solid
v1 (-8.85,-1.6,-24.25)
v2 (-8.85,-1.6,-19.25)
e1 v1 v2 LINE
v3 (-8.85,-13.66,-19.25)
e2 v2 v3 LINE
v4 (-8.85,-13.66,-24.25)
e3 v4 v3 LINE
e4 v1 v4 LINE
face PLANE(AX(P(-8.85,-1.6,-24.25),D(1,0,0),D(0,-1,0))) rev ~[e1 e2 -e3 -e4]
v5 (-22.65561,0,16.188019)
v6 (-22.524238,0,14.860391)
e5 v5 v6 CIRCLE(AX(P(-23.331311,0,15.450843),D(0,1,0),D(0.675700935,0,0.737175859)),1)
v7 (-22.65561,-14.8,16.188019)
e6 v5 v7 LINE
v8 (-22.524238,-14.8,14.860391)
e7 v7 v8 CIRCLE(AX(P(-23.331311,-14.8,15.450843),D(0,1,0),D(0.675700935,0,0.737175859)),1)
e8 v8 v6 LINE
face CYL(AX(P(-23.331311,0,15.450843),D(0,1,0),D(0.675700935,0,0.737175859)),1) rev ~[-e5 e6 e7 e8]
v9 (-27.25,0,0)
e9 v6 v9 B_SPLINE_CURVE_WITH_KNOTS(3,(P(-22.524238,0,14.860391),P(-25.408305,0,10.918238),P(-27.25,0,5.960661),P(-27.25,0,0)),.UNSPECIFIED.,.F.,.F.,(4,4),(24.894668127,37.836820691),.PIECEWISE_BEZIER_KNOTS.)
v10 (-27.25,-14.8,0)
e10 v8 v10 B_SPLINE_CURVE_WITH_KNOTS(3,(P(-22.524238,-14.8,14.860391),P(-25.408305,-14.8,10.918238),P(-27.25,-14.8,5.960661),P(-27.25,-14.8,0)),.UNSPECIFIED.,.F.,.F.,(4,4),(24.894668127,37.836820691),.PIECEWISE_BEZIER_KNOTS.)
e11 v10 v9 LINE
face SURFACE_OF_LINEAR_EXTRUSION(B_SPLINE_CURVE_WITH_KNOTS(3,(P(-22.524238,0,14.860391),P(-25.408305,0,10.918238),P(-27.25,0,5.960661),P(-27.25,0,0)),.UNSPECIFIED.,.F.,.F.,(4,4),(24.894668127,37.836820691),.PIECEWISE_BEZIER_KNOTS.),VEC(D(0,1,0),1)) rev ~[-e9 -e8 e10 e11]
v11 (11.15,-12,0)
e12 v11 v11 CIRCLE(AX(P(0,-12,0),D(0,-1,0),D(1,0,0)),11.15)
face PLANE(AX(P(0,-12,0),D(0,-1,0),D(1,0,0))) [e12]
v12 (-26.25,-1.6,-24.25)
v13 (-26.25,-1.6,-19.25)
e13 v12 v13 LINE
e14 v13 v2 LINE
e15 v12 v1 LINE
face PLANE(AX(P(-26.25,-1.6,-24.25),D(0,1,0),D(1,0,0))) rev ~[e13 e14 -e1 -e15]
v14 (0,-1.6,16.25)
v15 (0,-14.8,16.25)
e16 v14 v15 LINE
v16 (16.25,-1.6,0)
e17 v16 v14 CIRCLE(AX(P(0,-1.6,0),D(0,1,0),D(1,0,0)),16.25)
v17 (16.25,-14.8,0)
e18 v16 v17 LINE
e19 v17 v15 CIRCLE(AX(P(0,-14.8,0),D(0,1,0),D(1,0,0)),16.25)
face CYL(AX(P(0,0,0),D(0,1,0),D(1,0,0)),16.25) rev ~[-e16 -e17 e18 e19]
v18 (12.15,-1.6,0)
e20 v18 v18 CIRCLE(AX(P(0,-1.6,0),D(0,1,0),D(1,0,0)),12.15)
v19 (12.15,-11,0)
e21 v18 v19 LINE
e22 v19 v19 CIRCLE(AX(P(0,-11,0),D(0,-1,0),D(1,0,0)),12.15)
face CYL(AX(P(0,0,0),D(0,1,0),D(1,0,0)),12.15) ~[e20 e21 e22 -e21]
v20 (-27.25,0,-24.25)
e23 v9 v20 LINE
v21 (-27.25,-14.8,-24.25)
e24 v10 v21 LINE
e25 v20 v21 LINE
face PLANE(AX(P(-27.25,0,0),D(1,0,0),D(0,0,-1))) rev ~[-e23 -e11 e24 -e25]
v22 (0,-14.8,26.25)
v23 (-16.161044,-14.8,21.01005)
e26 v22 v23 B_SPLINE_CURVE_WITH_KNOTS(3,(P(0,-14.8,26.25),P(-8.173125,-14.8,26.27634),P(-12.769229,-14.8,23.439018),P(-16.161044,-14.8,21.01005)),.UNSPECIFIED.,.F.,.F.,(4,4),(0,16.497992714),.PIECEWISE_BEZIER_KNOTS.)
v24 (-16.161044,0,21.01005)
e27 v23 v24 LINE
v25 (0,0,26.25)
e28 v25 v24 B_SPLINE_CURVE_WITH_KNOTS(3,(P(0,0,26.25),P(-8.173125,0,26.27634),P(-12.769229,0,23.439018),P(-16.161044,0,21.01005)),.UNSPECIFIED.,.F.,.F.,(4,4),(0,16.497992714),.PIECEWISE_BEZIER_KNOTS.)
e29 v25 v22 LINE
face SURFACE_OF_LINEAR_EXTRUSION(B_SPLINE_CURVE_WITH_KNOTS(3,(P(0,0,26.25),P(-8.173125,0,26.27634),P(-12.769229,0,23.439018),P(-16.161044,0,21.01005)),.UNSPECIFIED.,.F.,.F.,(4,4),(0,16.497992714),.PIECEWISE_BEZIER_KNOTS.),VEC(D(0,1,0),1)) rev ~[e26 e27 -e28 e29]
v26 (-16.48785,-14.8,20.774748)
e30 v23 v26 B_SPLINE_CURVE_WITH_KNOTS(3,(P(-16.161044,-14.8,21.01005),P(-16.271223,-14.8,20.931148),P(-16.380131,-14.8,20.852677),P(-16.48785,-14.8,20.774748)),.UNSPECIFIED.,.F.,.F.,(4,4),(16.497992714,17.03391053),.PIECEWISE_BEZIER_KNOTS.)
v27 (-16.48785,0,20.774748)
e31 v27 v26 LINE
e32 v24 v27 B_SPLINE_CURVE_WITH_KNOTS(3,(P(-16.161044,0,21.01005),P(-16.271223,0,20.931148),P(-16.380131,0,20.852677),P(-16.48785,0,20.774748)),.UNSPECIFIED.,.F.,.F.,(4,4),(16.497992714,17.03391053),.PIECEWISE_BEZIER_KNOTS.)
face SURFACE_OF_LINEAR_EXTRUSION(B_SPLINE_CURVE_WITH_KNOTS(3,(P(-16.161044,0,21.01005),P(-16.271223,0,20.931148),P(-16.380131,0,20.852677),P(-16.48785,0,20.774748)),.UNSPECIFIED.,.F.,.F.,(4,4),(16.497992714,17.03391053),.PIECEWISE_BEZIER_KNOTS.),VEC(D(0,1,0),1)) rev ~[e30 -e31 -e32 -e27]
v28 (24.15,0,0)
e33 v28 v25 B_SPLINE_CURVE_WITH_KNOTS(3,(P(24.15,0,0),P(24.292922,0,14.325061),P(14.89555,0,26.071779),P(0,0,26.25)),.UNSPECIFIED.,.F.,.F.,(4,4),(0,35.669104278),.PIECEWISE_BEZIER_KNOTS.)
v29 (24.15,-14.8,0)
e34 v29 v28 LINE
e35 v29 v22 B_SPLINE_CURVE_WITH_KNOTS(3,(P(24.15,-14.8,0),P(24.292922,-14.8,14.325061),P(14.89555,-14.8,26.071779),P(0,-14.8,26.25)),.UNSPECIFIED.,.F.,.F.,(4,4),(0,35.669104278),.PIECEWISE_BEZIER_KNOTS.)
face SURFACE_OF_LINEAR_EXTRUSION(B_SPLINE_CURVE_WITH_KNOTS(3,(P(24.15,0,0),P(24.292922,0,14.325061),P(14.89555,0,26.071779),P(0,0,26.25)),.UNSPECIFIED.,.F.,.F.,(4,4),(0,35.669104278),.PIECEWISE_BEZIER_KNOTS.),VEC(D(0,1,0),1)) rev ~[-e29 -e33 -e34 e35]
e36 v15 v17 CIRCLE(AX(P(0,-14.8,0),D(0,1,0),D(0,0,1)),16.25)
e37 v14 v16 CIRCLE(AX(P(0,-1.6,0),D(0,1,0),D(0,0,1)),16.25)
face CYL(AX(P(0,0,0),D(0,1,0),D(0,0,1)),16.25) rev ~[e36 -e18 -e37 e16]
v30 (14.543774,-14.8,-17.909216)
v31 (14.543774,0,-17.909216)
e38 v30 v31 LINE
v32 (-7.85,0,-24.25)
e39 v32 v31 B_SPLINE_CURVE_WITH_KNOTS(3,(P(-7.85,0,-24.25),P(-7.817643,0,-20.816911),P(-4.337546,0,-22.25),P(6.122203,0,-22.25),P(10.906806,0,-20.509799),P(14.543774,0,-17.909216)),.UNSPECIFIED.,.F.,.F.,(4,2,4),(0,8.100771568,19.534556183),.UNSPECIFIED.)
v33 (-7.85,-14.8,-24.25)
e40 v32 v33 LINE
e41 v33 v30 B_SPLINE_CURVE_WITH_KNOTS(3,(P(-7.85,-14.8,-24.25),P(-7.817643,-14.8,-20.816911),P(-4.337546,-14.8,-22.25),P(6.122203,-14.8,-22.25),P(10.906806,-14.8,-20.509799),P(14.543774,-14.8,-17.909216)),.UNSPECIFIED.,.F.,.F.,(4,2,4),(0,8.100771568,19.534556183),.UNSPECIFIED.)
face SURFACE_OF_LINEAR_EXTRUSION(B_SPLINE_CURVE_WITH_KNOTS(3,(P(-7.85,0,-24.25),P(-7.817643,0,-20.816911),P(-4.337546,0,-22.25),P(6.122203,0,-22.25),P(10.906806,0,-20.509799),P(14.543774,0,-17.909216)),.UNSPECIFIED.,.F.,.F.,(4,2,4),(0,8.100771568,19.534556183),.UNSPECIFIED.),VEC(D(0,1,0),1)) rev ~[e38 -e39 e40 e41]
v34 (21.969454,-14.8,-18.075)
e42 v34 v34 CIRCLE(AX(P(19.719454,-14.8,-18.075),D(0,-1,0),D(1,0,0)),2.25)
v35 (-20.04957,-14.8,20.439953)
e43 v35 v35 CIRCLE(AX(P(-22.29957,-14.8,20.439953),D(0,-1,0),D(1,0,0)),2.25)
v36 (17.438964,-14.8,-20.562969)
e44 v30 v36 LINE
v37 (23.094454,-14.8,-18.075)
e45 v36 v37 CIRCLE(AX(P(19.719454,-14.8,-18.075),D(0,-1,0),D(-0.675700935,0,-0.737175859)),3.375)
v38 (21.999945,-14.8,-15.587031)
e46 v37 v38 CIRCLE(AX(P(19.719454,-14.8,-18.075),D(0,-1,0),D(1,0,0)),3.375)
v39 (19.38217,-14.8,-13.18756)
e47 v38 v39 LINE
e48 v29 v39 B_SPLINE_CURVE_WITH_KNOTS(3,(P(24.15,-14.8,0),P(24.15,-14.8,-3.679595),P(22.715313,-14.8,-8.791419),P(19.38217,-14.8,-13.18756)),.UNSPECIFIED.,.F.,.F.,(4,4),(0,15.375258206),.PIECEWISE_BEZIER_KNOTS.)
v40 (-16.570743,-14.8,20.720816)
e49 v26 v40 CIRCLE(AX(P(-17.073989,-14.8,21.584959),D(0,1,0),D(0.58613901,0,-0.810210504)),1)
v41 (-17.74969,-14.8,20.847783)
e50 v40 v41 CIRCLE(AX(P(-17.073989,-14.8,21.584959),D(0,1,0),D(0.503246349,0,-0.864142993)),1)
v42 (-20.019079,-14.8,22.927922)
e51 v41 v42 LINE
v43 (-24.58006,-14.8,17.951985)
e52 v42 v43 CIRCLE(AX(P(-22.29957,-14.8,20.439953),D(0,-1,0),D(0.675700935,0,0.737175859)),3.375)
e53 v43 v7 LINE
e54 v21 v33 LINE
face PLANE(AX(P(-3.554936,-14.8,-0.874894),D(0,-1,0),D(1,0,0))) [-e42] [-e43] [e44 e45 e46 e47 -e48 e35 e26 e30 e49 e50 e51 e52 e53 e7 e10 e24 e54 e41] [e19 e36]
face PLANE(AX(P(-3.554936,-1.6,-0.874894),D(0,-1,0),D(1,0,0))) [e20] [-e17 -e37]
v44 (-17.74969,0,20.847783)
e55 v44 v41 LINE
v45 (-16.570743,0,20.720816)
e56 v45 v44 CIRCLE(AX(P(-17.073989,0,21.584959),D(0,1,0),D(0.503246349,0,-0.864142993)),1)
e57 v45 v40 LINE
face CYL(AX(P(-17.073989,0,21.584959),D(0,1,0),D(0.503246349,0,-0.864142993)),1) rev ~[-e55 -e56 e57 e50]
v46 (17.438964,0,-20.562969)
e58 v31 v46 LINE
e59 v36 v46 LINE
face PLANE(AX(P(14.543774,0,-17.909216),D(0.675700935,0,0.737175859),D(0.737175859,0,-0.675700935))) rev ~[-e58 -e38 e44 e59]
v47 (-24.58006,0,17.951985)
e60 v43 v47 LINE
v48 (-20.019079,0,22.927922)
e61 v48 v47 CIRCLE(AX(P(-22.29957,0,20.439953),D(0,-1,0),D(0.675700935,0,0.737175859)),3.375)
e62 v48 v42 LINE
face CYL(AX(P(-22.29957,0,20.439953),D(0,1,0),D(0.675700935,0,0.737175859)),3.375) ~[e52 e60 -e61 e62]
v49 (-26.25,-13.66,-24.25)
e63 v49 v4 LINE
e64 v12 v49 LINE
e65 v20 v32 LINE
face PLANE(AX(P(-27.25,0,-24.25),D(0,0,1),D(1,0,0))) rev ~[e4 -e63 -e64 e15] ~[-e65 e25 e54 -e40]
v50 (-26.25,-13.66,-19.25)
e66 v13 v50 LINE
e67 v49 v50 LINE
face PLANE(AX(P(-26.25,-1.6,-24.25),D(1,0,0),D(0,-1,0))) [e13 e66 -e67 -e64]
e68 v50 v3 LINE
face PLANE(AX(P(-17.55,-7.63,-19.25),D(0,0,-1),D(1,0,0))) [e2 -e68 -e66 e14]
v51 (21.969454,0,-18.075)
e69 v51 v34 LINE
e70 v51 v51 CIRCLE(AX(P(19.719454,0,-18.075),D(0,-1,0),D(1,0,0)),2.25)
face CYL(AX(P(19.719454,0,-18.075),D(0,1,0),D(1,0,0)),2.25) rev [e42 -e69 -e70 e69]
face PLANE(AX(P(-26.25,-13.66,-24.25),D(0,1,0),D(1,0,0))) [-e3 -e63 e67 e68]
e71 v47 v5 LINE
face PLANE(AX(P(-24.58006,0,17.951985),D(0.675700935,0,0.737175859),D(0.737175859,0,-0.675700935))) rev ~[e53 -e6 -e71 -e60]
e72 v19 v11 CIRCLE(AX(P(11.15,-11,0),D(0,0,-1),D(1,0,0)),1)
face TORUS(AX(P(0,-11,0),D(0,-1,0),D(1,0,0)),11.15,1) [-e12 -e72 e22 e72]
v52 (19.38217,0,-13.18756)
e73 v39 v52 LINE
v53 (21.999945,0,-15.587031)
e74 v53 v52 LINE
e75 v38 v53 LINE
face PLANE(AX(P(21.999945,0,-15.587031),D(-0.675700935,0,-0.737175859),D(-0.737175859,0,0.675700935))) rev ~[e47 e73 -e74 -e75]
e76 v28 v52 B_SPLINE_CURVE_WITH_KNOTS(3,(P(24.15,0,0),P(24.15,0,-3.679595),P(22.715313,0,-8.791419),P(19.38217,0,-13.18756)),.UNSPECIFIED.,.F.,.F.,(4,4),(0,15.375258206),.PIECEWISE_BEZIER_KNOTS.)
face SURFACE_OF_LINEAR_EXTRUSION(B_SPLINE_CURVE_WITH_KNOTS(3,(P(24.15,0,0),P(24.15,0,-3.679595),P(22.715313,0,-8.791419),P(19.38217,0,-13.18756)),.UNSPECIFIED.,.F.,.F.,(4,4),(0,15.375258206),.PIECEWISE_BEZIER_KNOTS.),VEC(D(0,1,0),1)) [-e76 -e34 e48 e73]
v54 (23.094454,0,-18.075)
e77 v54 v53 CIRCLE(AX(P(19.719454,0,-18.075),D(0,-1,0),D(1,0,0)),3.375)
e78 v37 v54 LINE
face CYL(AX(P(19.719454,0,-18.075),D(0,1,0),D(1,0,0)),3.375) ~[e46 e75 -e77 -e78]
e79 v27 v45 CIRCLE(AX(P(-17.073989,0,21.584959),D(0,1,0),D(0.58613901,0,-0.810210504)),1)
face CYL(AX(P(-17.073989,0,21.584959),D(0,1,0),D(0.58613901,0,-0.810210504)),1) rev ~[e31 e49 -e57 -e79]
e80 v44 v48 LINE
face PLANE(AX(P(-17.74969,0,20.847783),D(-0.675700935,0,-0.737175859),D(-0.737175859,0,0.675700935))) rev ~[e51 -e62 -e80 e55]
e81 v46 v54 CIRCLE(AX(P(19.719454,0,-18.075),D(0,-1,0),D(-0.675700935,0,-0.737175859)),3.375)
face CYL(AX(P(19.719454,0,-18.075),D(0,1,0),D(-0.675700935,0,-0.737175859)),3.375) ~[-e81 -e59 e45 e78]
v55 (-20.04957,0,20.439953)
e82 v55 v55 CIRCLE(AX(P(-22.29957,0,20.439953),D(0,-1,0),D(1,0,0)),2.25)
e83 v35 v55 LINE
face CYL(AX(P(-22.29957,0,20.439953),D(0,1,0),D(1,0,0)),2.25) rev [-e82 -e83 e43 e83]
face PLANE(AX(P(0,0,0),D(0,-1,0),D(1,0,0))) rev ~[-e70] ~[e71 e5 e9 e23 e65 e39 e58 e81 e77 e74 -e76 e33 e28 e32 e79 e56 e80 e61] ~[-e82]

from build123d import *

# Parameters (mm, degrees)
F0_R     = 2.25
F1_DEPTH = 14.8
F0_R_2   = 12.15
F2_DEPTH = 1.6
F3_DEPTH = 12
F4_R     = 1
F5_W     = 17.4
F5_H     = 12.06
F6_DEPTH = 5


with BuildPart() as f1:
    # F0 (on Front) → F1 (new body)
    with BuildSketch(Plane.XZ):
        with BuildLine():
            Line((-27.25, 0), (-27.25, -24.25))
            Line((-27.25, -24.25), (-7.85, -24.25))
            add(Edge.make_bspline(
                [(-7.85, -24.25), (-7.8176427633, -20.8169110119), (-4.3375464156, -22.25), (0, -22.25)],
                knots=[0, 0, 0, 0, 8.1007715682, 8.1007715682, 8.1007715682, 8.1007715682], degree=3))
            add(Edge.make_bspline(
                [(14.5437740109, -17.909216005), (10.9068056005, -20.5097986935), (6.122203429, -22.25), (0, -22.25)],
                knots=[21.4185998801, 21.4185998801, 21.4185998801, 21.4185998801, 32.8372501894, 32.8372501894, 32.8372501894, 32.8372501894], degree=3))
            add(Edge.make_bspline(
                [(19.3821703567, -13.1875596661), (18.0720576154, -14.9154903789), (16.4686462302, -16.5328528348), (14.5437740109, -17.909216005)],
                knots=[15.3752582058, 15.3752582058, 15.3752582058, 15.3752582058, 21.4185998801, 21.4185998801, 21.4185998801, 21.4185998801], degree=3))
            add(Edge.make_bspline(
                [(24.15, 0), (24.15, -3.6795945823), (22.7153133033, -8.7914188713), (19.3821703567, -13.1875596661)],
                knots=[0, 0, 0, 0, 15.3752582058, 15.3752582058, 15.3752582058, 15.3752582058], degree=3))
            add(Edge.make_bspline(
                [(24.15, 0), (24.2929216474, 14.3250608817), (14.8955499753, 26.0717794299), (0, 26.25)],
                knots=[0, 0, 0, 0, 35.6691042781, 35.6691042781, 35.6691042781, 35.6691042781], degree=3))
            add(Edge.make_bspline(
                [(0, 26.25), (-5.135877891, 26.2629323961), (-11.114542158, 24.5071482084), (-16.161044046, 21.0100500089)],
                knots=[0, 0, 0, 0, 16.8847295513, 16.8847295513, 16.8847295513, 16.8847295513], degree=3))
            add(Edge.make_bspline(
                [(-16.161044046, 21.0100500089), (-16.2712231538, 20.9311478534), (-16.3801314978, 20.8526765927), (-16.487850408, 20.7747483814)],
                knots=[16.497992714, 16.497992714, 16.497992714, 16.497992714, 17.0339105302, 17.0339105302, 17.0339105302, 17.0339105302], degree=3))
            add(Edge.make_bspline(
                [(-16.487850408, 20.7747483814), (-16.7124834128, 20.6122397909), (-16.9319438817, 20.4520927797), (-17.1469693705, 20.2953244431)],
                knots=[17.0339105302, 17.0339105302, 17.0339105302, 17.0339105302, 18.1514935909, 18.1514935909, 18.1514935909, 18.1514935909], degree=3))
            add(Edge.make_bspline(
                [(-17.1469693705, 20.2953244431), (-19.1547308604, 18.7732329399), (-20.9874640515, 16.9609662016), (-22.5242380569, 14.8603912213)],
                knots=[17.9984458903, 17.9984458903, 17.9984458903, 17.9984458903, 24.8946681266, 24.8946681266, 24.8946681266, 24.8946681266], degree=3))
            add(Edge.make_bspline(
                [(-22.5242380569, 14.8603912213), (-25.4083045723, 10.9182384112), (-27.25, 5.9606612107), (-27.25, 0)],
                knots=[24.8946681266, 24.8946681266, 24.8946681266, 24.8946681266, 37.836820691, 37.836820691, 37.836820691, 37.836820691], degree=3))
        make_face()
        with BuildLine():
            ThreePointArc((16.25, 0), (-11.4904851943, -11.4904851943), (0, 16.25))
            ThreePointArc((0, 16.25), (11.4904851943, 11.4904851943), (16.25, 0))
        make_face(mode=Mode.SUBTRACT)
        with BuildLine():
            ThreePointArc((-22.6556099396, 16.1880189983), (-22.3361709954, 15.5493145647), (-22.5242380569, 14.8603912213))
            add(Edge.make_bspline(
                [(-17.1469693705, 20.2953244431), (-19.1547308604, 18.7732329399), (-20.9874640515, 16.9609662016), (-22.5242380569, 14.8603912213)],
                knots=[17.9984458903, 17.9984458903, 17.9984458903, 17.9984458903, 24.8946681266, 24.8946681266, 24.8946681266, 24.8946681266], degree=3))
            add(Edge.make_bspline(
                [(-16.5707430692, 20.7208158925), (-16.7643258601, 20.5815997135), (-16.9564357443, 20.4397686985), (-17.1469693705, 20.2953244431)],
                knots=[17.3440044956, 17.3440044956, 17.3440044956, 17.3440044956, 17.9984458903, 17.9984458903, 17.9984458903, 17.9984458903], degree=3))
            ThreePointArc((-16.5707430692, 20.7208158925), (-17.1810656026, 20.5907080667), (-17.7496903525, 20.8477830266))
            Line((-17.7496903525, 20.8477830266), (-20.0190790788, 22.927921795))
            ThreePointArc((-20.0190790788, 22.927921795), (-19.2102914227, 21.7989913577), (-18.924569733, 20.439953271))
            ThreePointArc((-18.924569733, 20.439953271), (-20.9405316464, 17.3506749607), (-24.5800603872, 17.9519847471))
            Line((-24.5800603872, 17.9519847471), (-22.6556099396, 16.1880189983))
        make_face()
        with BuildLine():
            add(Edge.make_bspline(
                [(19.3821703567, -13.1875596661), (18.0720576154, -14.9154903789), (16.4686462302, -16.5328528348), (14.5437740109, -17.909216005)],
                knots=[15.3752582058, 15.3752582058, 15.3752582058, 15.3752582058, 21.4185998801, 21.4185998801, 21.4185998801, 21.4185998801], degree=3))
            Line((14.5437740109, -17.909216005), (17.4389635725, -20.5629685239))
            ThreePointArc((17.4389635725, -20.5629685239), (17.2314857028, -15.7945093458), (21.9999448809, -15.5870314761))
            Line((21.9999448809, -15.5870314761), (19.3821703567, -13.1875596661))
        make_face()
        with BuildLine():
            add(Edge.make_bspline(
                [(-16.5707430692, 20.7208158925), (-16.7643258601, 20.5815997135), (-16.9564357443, 20.4397686985), (-17.1469693705, 20.2953244431)],
                knots=[17.3440044956, 17.3440044956, 17.3440044956, 17.3440044956, 17.9984458903, 17.9984458903, 17.9984458903, 17.9984458903], degree=3))
            add(Edge.make_bspline(
                [(-16.487850408, 20.7747483814), (-16.7124834128, 20.6122397909), (-16.9319438817, 20.4520927797), (-17.1469693705, 20.2953244431)],
                knots=[17.0339105302, 17.0339105302, 17.0339105302, 17.0339105302, 18.1514935909, 18.1514935909, 18.1514935909, 18.1514935909], degree=3))
            ThreePointArc((-16.487850408, 20.7747483814), (-16.5286296346, 20.7467568176), (-16.5707430692, 20.7208158925))
        make_face()
        with BuildLine():
            ThreePointArc((21.9999448809, -15.5870314761), (17.2314857028, -15.7945093458), (17.4389635725, -20.5629685239))
            ThreePointArc((17.4389635725, -20.5629685239), (21.0784923134, -21.1642783104), (23.0944542267, -18.075))
            ThreePointArc((23.0944542267, -18.075), (22.8087325371, -16.7159619133), (21.9999448809, -15.5870314761))
        make_face()
        with Locations((19.7194542267, -18.075)):
            Circle(F0_R, mode=Mode.SUBTRACT)
        with BuildLine():
            ThreePointArc((-20.0190790788, 22.927921795), (-24.787538257, 22.7204439252), (-24.5800603872, 17.9519847471))
            ThreePointArc((-24.5800603872, 17.9519847471), (-20.9405316464, 17.3506749607), (-18.924569733, 20.439953271))
            ThreePointArc((-18.924569733, 20.439953271), (-19.2102914227, 21.7989913577), (-20.0190790788, 22.927921795))
        make_face()
        with Locations((-22.299569733, 20.439953271)):
            Circle(F0_R, mode=Mode.SUBTRACT)
        with BuildLine():
            add(Edge.make_bspline(
                [(0, 26.25), (-8.1731251983, 26.2763401513), (-12.7692289915, 23.4390179358), (-16.161044046, 21.0100500089)],
                knots=[0, 0, 0, 0, 16.497992714, 16.497992714, 16.497992714, 16.497992714], degree=3))
            add(Edge.make_bspline(
                [(0, 26.25), (-5.135877891, 26.2629323961), (-11.114542158, 24.5071482084), (-16.161044046, 21.0100500089)],
                knots=[0, 0, 0, 0, 16.8847295513, 16.8847295513, 16.8847295513, 16.8847295513], degree=3))
        make_face()
    extrude(amount=F1_DEPTH)

    # F0 (on Front) → F2 (join)
    with BuildSketch(Plane.XZ):
        with BuildLine():
            Line((-27.25, 0), (-27.25, -24.25))
            Line((-27.25, -24.25), (-7.85, -24.25))
            add(Edge.make_bspline(
                [(-7.85, -24.25), (-7.8176427633, -20.8169110119), (-4.3375464156, -22.25), (0, -22.25)],
                knots=[0, 0, 0, 0, 8.1007715682, 8.1007715682, 8.1007715682, 8.1007715682], degree=3))
            add(Edge.make_bspline(
                [(14.5437740109, -17.909216005), (10.9068056005, -20.5097986935), (6.122203429, -22.25), (0, -22.25)],
                knots=[21.4185998801, 21.4185998801, 21.4185998801, 21.4185998801, 32.8372501894, 32.8372501894, 32.8372501894, 32.8372501894], degree=3))
            add(Edge.make_bspline(
                [(19.3821703567, -13.1875596661), (18.0720576154, -14.9154903789), (16.4686462302, -16.5328528348), (14.5437740109, -17.909216005)],
                knots=[15.3752582058, 15.3752582058, 15.3752582058, 15.3752582058, 21.4185998801, 21.4185998801, 21.4185998801, 21.4185998801], degree=3))
            add(Edge.make_bspline(
                [(24.15, 0), (24.15, -3.6795945823), (22.7153133033, -8.7914188713), (19.3821703567, -13.1875596661)],
                knots=[0, 0, 0, 0, 15.3752582058, 15.3752582058, 15.3752582058, 15.3752582058], degree=3))
            add(Edge.make_bspline(
                [(24.15, 0), (24.2929216474, 14.3250608817), (14.8955499753, 26.0717794299), (0, 26.25)],
                knots=[0, 0, 0, 0, 35.6691042781, 35.6691042781, 35.6691042781, 35.6691042781], degree=3))
            add(Edge.make_bspline(
                [(0, 26.25), (-5.135877891, 26.2629323961), (-11.114542158, 24.5071482084), (-16.161044046, 21.0100500089)],
                knots=[0, 0, 0, 0, 16.8847295513, 16.8847295513, 16.8847295513, 16.8847295513], degree=3))
            add(Edge.make_bspline(
                [(-16.161044046, 21.0100500089), (-16.2712231538, 20.9311478534), (-16.3801314978, 20.8526765927), (-16.487850408, 20.7747483814)],
                knots=[16.497992714, 16.497992714, 16.497992714, 16.497992714, 17.0339105302, 17.0339105302, 17.0339105302, 17.0339105302], degree=3))
            add(Edge.make_bspline(
                [(-16.487850408, 20.7747483814), (-16.7124834128, 20.6122397909), (-16.9319438817, 20.4520927797), (-17.1469693705, 20.2953244431)],
                knots=[17.0339105302, 17.0339105302, 17.0339105302, 17.0339105302, 18.1514935909, 18.1514935909, 18.1514935909, 18.1514935909], degree=3))
            add(Edge.make_bspline(
                [(-17.1469693705, 20.2953244431), (-19.1547308604, 18.7732329399), (-20.9874640515, 16.9609662016), (-22.5242380569, 14.8603912213)],
                knots=[17.9984458903, 17.9984458903, 17.9984458903, 17.9984458903, 24.8946681266, 24.8946681266, 24.8946681266, 24.8946681266], degree=3))
            add(Edge.make_bspline(
                [(-22.5242380569, 14.8603912213), (-25.4083045723, 10.9182384112), (-27.25, 5.9606612107), (-27.25, 0)],
                knots=[24.8946681266, 24.8946681266, 24.8946681266, 24.8946681266, 37.836820691, 37.836820691, 37.836820691, 37.836820691], degree=3))
        make_face()
        with BuildLine():
            ThreePointArc((16.25, 0), (-11.4904851943, -11.4904851943), (0, 16.25))
            ThreePointArc((0, 16.25), (11.4904851943, 11.4904851943), (16.25, 0))
        make_face(mode=Mode.SUBTRACT)
        with BuildLine():
            ThreePointArc((16.25, 0), (11.4904851943, 11.4904851943), (0, 16.25))
            ThreePointArc((0, 16.25), (-11.4904851943, -11.4904851943), (16.25, 0))
        make_face()
        Circle(F0_R_2, mode=Mode.SUBTRACT)
        Circle(F0_R_2)
        with BuildLine():
            ThreePointArc((-20.0190790788, 22.927921795), (-24.787538257, 22.7204439252), (-24.5800603872, 17.9519847471))
            ThreePointArc((-24.5800603872, 17.9519847471), (-20.9405316464, 17.3506749607), (-18.924569733, 20.439953271))
            ThreePointArc((-18.924569733, 20.439953271), (-19.2102914227, 21.7989913577), (-20.0190790788, 22.927921795))
        make_face()
        with Locations((-22.299569733, 20.439953271)):
            Circle(F0_R, mode=Mode.SUBTRACT)
        with BuildLine():
            ThreePointArc((21.9999448809, -15.5870314761), (17.2314857028, -15.7945093458), (17.4389635725, -20.5629685239))
            ThreePointArc((17.4389635725, -20.5629685239), (21.0784923134, -21.1642783104), (23.0944542267, -18.075))
            ThreePointArc((23.0944542267, -18.075), (22.8087325371, -16.7159619133), (21.9999448809, -15.5870314761))
        make_face()
        with Locations((19.7194542267, -18.075)):
            Circle(F0_R, mode=Mode.SUBTRACT)
        with BuildLine():
            add(Edge.make_bspline(
                [(19.3821703567, -13.1875596661), (18.0720576154, -14.9154903789), (16.4686462302, -16.5328528348), (14.5437740109, -17.909216005)],
                knots=[15.3752582058, 15.3752582058, 15.3752582058, 15.3752582058, 21.4185998801, 21.4185998801, 21.4185998801, 21.4185998801], degree=3))
            Line((14.5437740109, -17.909216005), (17.4389635725, -20.5629685239))
            ThreePointArc((17.4389635725, -20.5629685239), (17.2314857028, -15.7945093458), (21.9999448809, -15.5870314761))
            Line((21.9999448809, -15.5870314761), (19.3821703567, -13.1875596661))
        make_face()
    extrude(amount=F2_DEPTH)

    # F0 (on Front) → F3 (join)
    with BuildSketch(Plane.XZ):
        Circle(F0_R_2)
    extrude(amount=F3_DEPTH)

    # F4
    f4_edges = [f1.edges().sort_by_distance(p)[0] for p in [
        (-12.15, -12, 0),
    ]]
    fillet(f4_edges, radius=F4_R)

    # F5 (on face) → F6 (cut)
    with BuildSketch(Plane(origin=(0, 0, -24.25), x_dir=(1, 0, 0), z_dir=(0, 0, -1))):
        with Locations((-17.55, 7.63)):
            Rectangle(F5_W, F5_H)
    extrude(amount=-F6_DEPTH, mode=Mode.SUBTRACT)


solid = f1.part
